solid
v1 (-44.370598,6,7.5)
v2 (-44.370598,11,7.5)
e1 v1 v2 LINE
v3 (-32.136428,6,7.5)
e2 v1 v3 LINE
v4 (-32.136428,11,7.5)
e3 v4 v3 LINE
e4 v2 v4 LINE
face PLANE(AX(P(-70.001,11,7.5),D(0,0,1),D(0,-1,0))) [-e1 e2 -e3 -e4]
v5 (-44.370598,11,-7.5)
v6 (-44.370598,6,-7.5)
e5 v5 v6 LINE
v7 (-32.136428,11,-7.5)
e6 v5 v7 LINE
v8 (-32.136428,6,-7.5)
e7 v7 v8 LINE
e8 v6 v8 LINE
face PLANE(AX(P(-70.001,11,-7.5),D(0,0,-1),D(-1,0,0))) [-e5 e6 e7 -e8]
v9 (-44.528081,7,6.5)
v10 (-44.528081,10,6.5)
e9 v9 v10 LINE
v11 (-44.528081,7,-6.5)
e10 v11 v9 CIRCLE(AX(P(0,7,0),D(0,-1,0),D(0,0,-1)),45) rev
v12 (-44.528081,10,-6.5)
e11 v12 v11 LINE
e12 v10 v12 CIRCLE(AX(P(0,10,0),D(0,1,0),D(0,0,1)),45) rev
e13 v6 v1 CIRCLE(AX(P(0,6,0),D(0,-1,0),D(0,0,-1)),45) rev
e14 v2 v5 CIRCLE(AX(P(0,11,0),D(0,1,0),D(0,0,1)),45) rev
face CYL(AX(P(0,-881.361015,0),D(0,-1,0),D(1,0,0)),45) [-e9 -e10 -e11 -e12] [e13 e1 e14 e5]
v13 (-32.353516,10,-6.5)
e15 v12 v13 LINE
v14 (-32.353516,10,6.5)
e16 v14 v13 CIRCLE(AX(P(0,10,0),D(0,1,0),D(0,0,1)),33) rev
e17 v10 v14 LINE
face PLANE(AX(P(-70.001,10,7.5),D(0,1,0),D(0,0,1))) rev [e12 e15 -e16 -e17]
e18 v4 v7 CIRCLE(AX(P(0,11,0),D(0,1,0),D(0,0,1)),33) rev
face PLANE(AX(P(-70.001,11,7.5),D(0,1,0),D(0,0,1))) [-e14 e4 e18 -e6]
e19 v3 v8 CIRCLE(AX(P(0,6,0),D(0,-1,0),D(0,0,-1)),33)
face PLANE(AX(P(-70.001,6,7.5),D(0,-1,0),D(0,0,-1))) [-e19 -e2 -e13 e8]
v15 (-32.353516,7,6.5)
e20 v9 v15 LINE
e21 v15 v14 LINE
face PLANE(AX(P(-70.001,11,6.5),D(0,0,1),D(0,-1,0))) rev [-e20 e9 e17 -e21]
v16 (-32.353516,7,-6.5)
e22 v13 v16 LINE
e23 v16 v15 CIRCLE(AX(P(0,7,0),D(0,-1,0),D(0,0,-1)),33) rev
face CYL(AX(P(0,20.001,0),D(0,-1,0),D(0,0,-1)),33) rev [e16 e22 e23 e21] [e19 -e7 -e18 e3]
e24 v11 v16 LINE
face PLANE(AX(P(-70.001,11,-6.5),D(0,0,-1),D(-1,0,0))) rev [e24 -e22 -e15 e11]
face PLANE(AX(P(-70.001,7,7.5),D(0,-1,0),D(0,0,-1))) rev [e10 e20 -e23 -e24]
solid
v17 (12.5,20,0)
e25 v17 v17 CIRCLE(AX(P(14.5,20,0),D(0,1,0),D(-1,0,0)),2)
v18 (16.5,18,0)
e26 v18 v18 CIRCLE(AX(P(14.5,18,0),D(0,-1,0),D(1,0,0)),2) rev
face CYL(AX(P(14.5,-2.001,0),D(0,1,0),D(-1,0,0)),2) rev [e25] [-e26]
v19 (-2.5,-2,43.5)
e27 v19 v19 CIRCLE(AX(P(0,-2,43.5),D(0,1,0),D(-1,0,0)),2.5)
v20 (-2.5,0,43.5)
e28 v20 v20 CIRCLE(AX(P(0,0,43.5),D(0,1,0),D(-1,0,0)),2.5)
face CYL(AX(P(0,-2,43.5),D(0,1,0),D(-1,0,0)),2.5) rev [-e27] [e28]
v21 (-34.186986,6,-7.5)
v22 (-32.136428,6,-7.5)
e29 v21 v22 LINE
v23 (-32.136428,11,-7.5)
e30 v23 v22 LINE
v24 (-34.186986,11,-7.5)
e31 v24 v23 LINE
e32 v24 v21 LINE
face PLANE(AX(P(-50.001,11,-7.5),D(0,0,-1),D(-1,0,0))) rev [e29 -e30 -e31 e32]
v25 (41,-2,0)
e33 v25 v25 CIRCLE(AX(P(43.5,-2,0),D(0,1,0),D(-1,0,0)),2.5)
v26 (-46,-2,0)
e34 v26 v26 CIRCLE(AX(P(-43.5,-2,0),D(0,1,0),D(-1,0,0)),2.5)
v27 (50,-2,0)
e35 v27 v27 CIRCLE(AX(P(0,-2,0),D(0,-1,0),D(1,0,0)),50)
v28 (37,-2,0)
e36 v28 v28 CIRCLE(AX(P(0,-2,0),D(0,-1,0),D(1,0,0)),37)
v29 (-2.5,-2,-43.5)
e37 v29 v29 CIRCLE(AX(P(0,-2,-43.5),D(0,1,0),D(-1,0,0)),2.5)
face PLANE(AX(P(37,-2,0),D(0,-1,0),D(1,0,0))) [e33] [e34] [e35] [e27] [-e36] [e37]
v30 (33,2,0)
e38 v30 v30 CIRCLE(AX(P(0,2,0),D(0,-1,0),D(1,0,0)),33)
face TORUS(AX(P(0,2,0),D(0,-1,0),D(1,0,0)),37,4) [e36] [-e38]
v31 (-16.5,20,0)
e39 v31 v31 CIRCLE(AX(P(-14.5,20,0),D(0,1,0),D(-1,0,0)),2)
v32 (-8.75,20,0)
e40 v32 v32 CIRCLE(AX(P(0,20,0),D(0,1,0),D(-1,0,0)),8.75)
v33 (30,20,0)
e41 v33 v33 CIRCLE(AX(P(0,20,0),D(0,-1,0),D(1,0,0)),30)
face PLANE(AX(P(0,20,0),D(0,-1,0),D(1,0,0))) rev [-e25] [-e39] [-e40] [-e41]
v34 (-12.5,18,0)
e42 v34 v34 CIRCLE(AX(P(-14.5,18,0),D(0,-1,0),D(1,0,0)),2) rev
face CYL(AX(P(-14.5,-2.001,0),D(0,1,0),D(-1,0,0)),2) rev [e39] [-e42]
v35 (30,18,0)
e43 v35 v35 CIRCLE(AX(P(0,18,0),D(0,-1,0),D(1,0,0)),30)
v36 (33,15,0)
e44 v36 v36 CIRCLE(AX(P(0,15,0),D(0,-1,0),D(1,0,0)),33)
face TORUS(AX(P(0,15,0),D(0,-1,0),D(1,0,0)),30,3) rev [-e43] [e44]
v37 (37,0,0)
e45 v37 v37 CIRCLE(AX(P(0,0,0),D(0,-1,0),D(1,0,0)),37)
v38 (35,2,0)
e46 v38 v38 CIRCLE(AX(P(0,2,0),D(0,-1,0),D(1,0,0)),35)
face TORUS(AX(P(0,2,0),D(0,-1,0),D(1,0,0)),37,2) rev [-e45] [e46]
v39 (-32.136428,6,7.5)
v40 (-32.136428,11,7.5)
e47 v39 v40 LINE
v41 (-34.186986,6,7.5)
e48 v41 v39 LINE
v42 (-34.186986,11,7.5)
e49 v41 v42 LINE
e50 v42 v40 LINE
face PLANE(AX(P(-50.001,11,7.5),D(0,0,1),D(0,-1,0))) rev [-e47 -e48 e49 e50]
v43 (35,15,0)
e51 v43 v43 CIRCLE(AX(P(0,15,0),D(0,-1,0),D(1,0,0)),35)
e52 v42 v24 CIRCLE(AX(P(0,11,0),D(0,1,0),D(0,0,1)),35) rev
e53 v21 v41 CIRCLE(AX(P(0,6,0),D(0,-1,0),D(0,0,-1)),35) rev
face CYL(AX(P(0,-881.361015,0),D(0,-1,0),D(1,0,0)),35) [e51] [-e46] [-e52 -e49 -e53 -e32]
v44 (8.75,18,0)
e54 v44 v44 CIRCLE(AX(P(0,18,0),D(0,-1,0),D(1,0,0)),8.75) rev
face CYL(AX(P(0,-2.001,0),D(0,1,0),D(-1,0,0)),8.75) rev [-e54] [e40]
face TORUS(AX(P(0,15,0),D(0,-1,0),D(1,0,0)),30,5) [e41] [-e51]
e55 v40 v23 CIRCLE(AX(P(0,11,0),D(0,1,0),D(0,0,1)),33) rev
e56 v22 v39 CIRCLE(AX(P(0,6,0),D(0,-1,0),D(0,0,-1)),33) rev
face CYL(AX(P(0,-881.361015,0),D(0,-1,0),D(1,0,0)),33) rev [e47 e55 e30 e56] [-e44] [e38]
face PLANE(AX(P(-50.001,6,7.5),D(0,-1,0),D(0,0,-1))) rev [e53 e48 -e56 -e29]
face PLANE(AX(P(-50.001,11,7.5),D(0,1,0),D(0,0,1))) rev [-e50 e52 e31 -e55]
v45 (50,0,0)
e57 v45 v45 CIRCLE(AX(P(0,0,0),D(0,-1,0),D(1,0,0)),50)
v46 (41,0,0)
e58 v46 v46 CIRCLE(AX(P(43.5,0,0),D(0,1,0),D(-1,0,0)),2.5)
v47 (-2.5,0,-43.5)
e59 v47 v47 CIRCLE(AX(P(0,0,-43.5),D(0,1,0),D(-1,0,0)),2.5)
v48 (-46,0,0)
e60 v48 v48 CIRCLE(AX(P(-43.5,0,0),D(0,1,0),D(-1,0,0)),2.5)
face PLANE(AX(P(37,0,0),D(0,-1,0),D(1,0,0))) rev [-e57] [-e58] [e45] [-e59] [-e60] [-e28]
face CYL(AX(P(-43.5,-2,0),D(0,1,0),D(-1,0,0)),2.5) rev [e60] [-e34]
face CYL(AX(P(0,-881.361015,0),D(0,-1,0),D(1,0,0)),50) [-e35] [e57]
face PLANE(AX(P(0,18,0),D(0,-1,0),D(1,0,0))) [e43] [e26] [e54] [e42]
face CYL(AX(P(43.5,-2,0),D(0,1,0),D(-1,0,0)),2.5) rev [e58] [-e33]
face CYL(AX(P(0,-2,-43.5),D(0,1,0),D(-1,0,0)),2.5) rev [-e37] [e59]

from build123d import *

# Parameters (mm, degrees)
CUT_EXTRUDE1_REACH       = 76.054
SKETCH2_R                = 2
SKETCH2_R_2              = 8.75
CUT_EXTRUDE2_REACH       = 75.485
CUT_EXTRUDE2_END_RADIUS  = 35
SKETCH3_W                = 15
SKETCH3_H                = 5
EXTRUDE_THIN1_REACH      = 75.485
EXTRUDE_THIN1_END_RADIUS = 45
SKETCH3_2_W              = 15
SKETCH3_2_H              = 5
SKETCH3_2_W_2            = 13
SKETCH3_2_H_2            = 3
CUT_EXTRUDE3_START       = -5
CUT_EXTRUDE3_DEPTH       = 5
SKETCH5_R                = 2.5
CUT_EXTRUDE4_DEPTH       = 74.484692283


with BuildPart() as part:
    # Sketch1 → Revolve-Thin1 (revolve)
    with BuildSketch(Plane.XY):
        with BuildLine():
            Line((0, 20), (30, 20))
            ThreePointArc((30, 20), (33.535533906, 18.535533906), (35, 15))
            Line((35, 15), (35, 2))
            ThreePointArc((35, 2), (35.585786438, 0.585786438), (37, 0))
            Line((37, 0), (50, 0))
            Line((50, 0), (50, -2))
            Line((50, -2), (37, -2))
            ThreePointArc((37, -2), (34.171572875, -0.828427125), (33, 2))
            Line((33, 2), (33, 15))
            ThreePointArc((33, 15), (32.121320344, 17.121320344), (30, 18))
            Line((30, 18), (0, 18))
            Line((0, 18), (0, 20))
        make_face()
    revolve(axis=Axis((0, -881.36101513, 0), (0, 1, 0)))

    # Sketch2 → Cut-Extrude1 (cut, up to next)
    with BuildSketch(Plane(origin=(0, 20, 0), x_dir=(1, 0, 0), z_dir=(0, 1, 0)), mode=Mode.PRIVATE) as cut_extrude1_sk1:
        with Locations(Location((14.5, 0, 0), (0, 0, 180))):
            Circle(SKETCH2_R)
    cut_extrude1_tool1 = extrude(cut_extrude1_sk1.sketch, amount=-CUT_EXTRUDE1_REACH, mode=Mode.PRIVATE) & part.part
    # Sketch2 → Cut-Extrude1 (cut, up to next)
    with BuildSketch(Plane(origin=(0, 20, 0), x_dir=(1, 0, 0), z_dir=(0, 1, 0)), mode=Mode.PRIVATE) as cut_extrude1_sk2:
        with Locations(Location((-14.5, 0, 0), (0, 0, 180))):
            Circle(SKETCH2_R)
    cut_extrude1_tool2 = extrude(cut_extrude1_sk2.sketch, amount=-CUT_EXTRUDE1_REACH, mode=Mode.PRIVATE) & part.part
    # Sketch2 → Cut-Extrude1 (cut, up to next)
    with BuildSketch(Plane(origin=(0, 20, 0), x_dir=(1, 0, 0), z_dir=(0, 1, 0)), mode=Mode.PRIVATE) as cut_extrude1_sk3:
        with Locations(Location((0, 0, 0), (0, 0, 180))):
            Circle(SKETCH2_R_2)
    cut_extrude1_tool3 = extrude(cut_extrude1_sk3.sketch, amount=-CUT_EXTRUDE1_REACH, mode=Mode.PRIVATE) & part.part
    add(cut_extrude1_tool1.solids().sort_by_distance((14.5, 20, 0))[0], mode=Mode.SUBTRACT)
    add(cut_extrude1_tool2.solids().sort_by_distance((-14.5, 20, 0))[0], mode=Mode.SUBTRACT)
    add(cut_extrude1_tool3.solids().sort_by_distance((0, 20, 0))[0], mode=Mode.SUBTRACT)

    # Cut-Extrude2: up to this cylinder (the profile starts inside it)
    cut_extrude2_end = Plane(origin=(0, 8.5, 0), z_dir=(0, -1, 0)) * Cylinder(CUT_EXTRUDE2_END_RADIUS, 221.97, mode=Mode.PRIVATE)
    # Sketch3 → Cut-Extrude2 (cut, up to the surface)
    with BuildSketch(Plane(origin=(0, 0, 0), x_dir=(0, 0, -1), z_dir=(1, 0, 0)), mode=Mode.PRIVATE) as cut_extrude2_sk1:
        with Locations((0, 8.5)):
            Rectangle(SKETCH3_W, SKETCH3_H)
    cut_extrude2_tool1 = extrude(cut_extrude2_sk1.sketch, amount=-CUT_EXTRUDE2_REACH, mode=Mode.PRIVATE) & cut_extrude2_end
    add(cut_extrude2_tool1.solids().sort_by_distance((0, 8.5, 0))[0], mode=Mode.SUBTRACT)

    # Sketch5 → Cut-Extrude4 (cut, through all)
    with BuildSketch(Plane(origin=(0, 0, 0), x_dir=(1, 0, 0), z_dir=(0, 1, 0))):
        with Locations(Location((0, 43.5, 0), (0, 0, 180))):
            Circle(SKETCH5_R)
        with Locations(Location((43.5, 0, 0), (0, 0, 180))):
            Circle(SKETCH5_R)
        with Locations(Location((0, -43.5, 0), (0, 0, 180))):
            Circle(SKETCH5_R)
        with Locations(Location((-43.5, 0, 0), (0, 0, 180))):
            Circle(SKETCH5_R)
    extrude(amount=-CUT_EXTRUDE4_DEPTH, mode=Mode.SUBTRACT)


with BuildPart() as body_2:
    # Extrude-Thin1: up to this cylinder (the profile starts inside it)
    extrude_thin1_end = Plane(origin=(0, 6.158114, 0), z_dir=(0, -1, 0)) * Cylinder(EXTRUDE_THIN1_END_RADIUS, 241.97, mode=Mode.PRIVATE)
    # Sketch3<2> → Extrude-Thin1 (new, up to the surface)
    with BuildSketch(Plane(origin=(0, 0, 0), x_dir=(0, 0, -1), z_dir=(1, 0, 0)), mode=Mode.PRIVATE) as extrude_thin1_sk1:
        with Locations((0, 8.5)):
            Rectangle(SKETCH3_2_W, SKETCH3_2_H)
        with Locations((0, 8.5)):
            Rectangle(SKETCH3_2_W_2, SKETCH3_2_H_2, mode=Mode.SUBTRACT)
    extrude_thin1_tool1 = extrude(extrude_thin1_sk1.sketch, amount=-EXTRUDE_THIN1_REACH, mode=Mode.PRIVATE) & extrude_thin1_end
    add(extrude_thin1_tool1.solids().sort_by_distance((0, 6.158114, 0))[0])

    # Sketch4 → Cut-Extrude3 (cut)
    with BuildSketch(Plane.XZ.offset(-6).offset(CUT_EXTRUDE3_START)):
        with BuildLine():
            Line((-32.136427928, -7.5), (0, -7.5))
            Line((0, -7.5), (0, 7.5))
            Line((0, 7.5), (-32.136427928, 7.5))
            ThreePointArc((-32.136427928, 7.5), (-33, 0), (-32.136427928, -7.5))
        make_face()
    extrude(amount=CUT_EXTRUDE3_DEPTH, mode=Mode.SUBTRACT)


solid = Compound([part.part, body_2.part])
